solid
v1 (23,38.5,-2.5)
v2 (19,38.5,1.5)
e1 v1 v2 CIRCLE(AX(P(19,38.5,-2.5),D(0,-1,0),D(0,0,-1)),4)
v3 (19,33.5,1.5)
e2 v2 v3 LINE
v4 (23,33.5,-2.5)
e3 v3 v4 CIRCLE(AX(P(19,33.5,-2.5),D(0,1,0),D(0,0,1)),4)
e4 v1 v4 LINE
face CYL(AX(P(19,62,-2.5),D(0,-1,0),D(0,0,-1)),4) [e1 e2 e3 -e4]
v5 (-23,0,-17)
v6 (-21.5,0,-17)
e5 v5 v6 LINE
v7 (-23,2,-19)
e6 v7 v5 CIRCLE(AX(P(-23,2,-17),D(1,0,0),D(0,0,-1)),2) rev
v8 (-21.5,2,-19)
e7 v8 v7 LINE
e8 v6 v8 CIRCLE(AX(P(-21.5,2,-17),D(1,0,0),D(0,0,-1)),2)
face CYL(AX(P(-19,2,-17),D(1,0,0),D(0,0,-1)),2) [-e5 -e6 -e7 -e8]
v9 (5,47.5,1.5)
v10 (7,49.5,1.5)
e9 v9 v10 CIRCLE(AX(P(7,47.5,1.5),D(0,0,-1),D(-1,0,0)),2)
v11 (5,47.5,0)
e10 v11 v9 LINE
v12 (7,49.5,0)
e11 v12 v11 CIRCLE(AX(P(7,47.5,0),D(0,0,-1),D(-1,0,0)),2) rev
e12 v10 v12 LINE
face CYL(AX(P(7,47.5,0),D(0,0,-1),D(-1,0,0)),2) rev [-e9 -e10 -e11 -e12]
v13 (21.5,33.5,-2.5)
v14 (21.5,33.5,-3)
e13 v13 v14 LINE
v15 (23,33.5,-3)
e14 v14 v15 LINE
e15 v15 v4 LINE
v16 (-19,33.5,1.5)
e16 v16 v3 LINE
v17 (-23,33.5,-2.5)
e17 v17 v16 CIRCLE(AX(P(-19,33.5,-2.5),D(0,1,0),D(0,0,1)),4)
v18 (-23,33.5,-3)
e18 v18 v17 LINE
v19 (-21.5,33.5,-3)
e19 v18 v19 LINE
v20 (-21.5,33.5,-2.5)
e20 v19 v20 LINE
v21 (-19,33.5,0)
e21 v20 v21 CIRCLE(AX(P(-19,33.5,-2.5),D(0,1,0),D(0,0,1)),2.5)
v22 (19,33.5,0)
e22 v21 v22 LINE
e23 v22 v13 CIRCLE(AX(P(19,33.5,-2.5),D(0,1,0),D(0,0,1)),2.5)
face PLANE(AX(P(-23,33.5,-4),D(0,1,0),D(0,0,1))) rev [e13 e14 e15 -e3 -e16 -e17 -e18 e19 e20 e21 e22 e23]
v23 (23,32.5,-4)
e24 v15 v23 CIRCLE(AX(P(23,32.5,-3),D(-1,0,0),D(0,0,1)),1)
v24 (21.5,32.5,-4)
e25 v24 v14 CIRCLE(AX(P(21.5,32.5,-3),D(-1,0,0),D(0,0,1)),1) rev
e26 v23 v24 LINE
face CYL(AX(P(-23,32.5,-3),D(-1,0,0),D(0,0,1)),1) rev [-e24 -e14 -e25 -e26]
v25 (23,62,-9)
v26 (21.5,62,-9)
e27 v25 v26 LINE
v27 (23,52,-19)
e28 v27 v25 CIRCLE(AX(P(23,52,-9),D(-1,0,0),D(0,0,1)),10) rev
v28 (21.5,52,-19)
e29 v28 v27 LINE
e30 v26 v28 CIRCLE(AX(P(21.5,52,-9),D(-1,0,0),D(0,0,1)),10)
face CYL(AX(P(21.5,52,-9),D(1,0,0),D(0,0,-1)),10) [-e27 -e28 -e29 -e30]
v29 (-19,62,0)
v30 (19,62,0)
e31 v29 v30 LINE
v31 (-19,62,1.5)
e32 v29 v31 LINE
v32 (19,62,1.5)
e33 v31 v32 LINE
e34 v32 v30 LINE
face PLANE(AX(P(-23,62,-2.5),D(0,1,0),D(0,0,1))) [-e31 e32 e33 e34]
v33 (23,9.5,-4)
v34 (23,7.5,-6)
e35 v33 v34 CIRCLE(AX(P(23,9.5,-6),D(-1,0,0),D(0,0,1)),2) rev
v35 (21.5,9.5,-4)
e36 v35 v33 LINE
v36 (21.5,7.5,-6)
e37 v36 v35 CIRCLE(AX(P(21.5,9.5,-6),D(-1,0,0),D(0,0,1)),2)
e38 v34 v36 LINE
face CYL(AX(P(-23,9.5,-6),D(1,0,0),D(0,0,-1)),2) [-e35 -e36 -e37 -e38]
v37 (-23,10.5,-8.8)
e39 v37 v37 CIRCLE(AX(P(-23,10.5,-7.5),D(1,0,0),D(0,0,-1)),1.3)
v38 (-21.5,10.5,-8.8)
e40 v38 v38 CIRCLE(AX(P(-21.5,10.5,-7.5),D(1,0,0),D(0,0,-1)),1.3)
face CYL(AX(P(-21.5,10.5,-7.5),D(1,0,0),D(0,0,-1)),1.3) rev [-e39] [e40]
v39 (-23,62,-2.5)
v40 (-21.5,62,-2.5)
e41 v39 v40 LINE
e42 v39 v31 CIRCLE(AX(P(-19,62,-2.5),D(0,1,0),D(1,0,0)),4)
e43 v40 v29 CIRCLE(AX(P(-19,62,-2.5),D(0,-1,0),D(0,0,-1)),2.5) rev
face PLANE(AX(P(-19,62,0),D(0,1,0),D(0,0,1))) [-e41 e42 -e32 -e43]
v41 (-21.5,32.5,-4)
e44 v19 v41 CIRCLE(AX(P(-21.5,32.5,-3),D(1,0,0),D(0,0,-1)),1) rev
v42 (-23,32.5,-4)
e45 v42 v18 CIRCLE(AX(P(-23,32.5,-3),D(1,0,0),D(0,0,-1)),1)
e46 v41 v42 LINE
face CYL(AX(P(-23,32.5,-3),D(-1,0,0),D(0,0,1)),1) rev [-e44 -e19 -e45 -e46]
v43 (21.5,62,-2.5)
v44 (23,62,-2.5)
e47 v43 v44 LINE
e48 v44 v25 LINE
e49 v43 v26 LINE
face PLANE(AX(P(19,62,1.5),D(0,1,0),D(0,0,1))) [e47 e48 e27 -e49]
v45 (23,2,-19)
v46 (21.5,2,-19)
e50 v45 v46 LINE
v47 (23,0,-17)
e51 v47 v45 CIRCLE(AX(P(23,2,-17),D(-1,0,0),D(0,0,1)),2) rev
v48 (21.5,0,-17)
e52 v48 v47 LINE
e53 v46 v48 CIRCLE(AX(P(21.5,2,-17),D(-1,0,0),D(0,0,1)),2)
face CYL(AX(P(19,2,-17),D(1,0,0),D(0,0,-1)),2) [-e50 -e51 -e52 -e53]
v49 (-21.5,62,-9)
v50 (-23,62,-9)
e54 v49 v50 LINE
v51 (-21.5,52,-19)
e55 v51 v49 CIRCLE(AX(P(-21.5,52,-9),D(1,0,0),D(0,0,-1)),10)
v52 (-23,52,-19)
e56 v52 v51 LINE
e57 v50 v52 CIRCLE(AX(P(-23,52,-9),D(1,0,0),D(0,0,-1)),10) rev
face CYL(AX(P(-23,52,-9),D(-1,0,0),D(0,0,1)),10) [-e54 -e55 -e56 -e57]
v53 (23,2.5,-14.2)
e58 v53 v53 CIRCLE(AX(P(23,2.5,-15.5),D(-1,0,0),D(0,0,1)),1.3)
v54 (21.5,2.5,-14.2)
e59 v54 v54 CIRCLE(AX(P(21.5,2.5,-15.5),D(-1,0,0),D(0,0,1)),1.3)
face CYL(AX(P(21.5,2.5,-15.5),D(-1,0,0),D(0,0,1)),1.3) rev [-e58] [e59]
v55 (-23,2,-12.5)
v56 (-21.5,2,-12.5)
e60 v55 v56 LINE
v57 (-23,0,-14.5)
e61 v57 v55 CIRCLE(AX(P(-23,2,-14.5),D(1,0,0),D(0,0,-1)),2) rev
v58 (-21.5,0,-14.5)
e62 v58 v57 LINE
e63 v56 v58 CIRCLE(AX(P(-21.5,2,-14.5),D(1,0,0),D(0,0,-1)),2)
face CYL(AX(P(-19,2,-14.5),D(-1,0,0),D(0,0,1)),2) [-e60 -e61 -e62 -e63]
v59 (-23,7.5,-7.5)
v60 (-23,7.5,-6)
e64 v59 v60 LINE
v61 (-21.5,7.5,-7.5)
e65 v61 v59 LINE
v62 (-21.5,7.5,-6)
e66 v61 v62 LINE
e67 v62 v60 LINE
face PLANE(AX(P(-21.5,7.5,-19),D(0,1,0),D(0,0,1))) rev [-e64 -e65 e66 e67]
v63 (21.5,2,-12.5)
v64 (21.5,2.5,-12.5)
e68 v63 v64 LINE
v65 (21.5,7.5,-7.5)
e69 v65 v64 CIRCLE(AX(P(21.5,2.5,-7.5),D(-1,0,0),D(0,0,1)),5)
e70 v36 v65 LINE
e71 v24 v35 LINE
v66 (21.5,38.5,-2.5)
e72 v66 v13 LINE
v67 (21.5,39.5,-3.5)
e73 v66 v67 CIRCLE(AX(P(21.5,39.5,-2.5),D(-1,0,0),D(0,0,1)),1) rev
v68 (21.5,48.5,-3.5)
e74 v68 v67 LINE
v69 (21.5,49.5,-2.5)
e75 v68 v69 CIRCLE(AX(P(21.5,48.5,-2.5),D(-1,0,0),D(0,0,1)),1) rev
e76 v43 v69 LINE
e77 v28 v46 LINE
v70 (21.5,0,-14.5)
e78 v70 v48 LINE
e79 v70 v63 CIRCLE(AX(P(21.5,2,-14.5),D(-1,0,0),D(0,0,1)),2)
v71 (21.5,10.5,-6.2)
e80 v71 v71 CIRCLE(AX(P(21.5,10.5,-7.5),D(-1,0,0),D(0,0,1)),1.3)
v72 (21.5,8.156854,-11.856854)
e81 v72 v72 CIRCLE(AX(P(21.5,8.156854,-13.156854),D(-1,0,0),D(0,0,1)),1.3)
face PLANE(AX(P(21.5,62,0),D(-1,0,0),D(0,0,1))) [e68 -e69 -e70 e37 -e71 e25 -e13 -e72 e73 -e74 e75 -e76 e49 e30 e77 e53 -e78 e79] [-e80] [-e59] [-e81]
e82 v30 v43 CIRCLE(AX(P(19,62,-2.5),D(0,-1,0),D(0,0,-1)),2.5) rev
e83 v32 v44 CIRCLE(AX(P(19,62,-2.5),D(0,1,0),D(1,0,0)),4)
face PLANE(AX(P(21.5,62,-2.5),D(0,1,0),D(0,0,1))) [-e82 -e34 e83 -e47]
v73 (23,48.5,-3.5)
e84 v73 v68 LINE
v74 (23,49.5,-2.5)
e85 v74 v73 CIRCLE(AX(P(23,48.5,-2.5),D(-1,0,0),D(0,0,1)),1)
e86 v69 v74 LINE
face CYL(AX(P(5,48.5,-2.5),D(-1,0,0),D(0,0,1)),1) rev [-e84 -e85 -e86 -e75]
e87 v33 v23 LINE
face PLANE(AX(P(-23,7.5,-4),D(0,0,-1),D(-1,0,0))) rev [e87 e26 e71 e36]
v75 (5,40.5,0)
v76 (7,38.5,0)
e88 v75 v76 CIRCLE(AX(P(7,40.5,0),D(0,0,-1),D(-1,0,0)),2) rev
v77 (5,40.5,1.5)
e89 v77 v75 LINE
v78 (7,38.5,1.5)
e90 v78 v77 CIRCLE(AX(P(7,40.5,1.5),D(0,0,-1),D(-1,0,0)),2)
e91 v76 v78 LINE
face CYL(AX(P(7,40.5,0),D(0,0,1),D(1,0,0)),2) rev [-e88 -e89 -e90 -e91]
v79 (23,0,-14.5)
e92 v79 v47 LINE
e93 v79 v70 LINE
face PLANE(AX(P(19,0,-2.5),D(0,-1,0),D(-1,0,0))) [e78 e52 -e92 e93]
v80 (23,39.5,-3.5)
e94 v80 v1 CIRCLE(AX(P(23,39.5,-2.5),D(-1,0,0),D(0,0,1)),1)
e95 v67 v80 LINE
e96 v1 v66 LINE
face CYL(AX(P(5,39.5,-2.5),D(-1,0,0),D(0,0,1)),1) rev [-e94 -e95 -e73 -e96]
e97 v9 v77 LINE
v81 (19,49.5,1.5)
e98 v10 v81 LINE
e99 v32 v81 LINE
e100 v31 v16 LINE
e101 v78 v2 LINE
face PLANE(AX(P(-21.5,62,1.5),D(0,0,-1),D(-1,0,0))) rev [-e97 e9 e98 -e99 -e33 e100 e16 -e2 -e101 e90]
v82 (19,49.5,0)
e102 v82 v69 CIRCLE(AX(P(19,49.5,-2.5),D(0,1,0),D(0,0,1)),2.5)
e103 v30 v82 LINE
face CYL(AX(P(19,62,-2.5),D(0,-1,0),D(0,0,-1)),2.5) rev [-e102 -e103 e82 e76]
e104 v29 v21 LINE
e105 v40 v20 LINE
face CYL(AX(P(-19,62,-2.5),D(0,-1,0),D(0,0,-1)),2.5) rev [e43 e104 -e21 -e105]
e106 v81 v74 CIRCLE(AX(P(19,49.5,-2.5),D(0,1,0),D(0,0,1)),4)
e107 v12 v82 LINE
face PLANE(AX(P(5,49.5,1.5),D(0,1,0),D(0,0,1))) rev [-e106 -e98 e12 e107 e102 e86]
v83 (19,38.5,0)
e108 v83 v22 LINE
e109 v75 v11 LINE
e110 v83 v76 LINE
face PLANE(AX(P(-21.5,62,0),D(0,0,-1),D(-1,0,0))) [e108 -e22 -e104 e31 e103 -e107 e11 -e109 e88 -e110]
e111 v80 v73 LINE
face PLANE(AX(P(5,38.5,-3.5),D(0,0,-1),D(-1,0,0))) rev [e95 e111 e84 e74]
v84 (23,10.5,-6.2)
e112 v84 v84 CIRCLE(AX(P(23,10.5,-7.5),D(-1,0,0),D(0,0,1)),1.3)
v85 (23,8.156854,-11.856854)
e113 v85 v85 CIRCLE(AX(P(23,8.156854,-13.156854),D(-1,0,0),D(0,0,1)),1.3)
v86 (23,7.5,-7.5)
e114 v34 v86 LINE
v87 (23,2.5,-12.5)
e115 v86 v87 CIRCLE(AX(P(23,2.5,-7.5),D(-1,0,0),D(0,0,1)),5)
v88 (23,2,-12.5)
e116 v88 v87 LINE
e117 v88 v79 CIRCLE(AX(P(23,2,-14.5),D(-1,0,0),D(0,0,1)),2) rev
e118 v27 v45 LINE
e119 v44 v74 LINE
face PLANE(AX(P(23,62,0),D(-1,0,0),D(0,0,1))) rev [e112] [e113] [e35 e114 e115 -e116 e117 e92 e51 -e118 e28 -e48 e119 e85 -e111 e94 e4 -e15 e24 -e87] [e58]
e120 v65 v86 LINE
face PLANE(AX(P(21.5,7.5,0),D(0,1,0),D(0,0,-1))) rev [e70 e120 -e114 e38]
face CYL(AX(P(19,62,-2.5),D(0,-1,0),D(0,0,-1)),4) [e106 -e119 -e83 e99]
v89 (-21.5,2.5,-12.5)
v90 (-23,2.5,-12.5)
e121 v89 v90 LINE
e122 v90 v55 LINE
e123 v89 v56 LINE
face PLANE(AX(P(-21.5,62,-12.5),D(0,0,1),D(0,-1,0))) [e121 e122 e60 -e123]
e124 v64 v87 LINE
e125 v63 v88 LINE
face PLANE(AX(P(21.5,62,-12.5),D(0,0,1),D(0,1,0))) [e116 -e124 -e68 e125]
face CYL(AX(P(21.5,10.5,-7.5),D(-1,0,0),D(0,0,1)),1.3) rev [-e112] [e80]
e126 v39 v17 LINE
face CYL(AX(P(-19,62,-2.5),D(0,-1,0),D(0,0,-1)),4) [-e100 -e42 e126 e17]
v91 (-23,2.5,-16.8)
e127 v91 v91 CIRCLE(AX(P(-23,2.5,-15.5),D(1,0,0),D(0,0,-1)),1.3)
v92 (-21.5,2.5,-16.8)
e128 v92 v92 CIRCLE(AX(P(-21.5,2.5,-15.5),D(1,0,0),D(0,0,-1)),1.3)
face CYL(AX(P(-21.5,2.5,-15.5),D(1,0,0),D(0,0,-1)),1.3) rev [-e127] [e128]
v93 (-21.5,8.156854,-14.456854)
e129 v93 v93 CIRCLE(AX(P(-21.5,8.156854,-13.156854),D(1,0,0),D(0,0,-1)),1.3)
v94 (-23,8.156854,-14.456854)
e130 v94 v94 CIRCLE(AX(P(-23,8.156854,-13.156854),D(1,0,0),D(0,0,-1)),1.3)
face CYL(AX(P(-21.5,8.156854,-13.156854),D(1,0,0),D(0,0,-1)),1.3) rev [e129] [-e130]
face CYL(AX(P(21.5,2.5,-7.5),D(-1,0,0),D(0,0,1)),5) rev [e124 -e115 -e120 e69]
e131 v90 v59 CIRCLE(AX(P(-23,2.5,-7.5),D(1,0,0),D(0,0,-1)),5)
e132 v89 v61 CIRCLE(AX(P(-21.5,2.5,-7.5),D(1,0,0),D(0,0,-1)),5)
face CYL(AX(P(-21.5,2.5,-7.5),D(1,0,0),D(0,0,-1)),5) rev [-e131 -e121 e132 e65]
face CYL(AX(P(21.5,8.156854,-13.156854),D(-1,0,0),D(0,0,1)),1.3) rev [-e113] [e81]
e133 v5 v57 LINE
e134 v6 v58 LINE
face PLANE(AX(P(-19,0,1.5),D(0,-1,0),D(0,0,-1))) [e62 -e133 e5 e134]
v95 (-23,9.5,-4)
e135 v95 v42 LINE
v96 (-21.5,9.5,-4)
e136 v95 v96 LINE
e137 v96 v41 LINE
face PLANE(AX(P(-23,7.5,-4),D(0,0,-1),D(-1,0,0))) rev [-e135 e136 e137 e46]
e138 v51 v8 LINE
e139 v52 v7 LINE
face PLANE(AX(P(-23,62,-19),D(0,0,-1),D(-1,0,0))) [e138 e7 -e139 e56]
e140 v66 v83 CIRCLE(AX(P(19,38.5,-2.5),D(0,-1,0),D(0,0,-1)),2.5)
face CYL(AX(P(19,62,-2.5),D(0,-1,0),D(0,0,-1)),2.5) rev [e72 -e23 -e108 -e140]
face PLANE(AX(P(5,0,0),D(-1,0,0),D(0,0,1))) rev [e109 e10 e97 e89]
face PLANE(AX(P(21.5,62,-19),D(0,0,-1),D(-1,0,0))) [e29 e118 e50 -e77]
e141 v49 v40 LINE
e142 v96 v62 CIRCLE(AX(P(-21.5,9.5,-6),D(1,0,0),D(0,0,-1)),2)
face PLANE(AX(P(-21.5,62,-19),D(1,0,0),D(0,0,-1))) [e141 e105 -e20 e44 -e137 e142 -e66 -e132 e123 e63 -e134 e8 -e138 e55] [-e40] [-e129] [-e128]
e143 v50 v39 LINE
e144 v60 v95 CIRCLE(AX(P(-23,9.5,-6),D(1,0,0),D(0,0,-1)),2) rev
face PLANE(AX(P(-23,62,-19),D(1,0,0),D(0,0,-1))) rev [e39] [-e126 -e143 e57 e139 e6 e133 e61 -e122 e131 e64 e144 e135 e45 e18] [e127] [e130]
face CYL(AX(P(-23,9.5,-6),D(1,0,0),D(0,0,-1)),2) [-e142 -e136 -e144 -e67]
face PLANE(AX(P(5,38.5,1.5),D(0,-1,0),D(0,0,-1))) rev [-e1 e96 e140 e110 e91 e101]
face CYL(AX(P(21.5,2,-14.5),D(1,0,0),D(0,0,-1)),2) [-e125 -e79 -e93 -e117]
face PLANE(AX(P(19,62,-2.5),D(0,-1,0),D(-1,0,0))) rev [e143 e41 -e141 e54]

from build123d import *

# Parameters (mm, degrees)
BASE_FLANGE1_DEPTH      = 62
CUT_EXTRUDE4_START      = -23
CUT_EXTRUDE4_OUTLINE_R  = 1.3
CUT_EXTRUDE4_DEPTH      = 46
CUT_EXTRUDE5_DEPTH      = 69.804069647
CUT_EXTRUDE5_DEPTH_BACK = 69.804069647
SKETCH9_W               = 9
SKETCH9_H               = 7.5
CUT_EXTRUDE7_DEPTH      = 69.804069647
CUT_EXTRUDE7_DEPTH_BACK = 69.804069647
SKETCH12_W              = 5.5
SKETCH12_H              = 26
SKETCH14_W              = 5
SKETCH14_H              = 11
CUT_EXTRUDE8_DEPTH      = 18
FILLET1_R               = 10
FILLET2_R               = 2
FILLET3_R               = 1


# Read off the part's stored shape, not the designer's step: Cut-Extrude4
# Sheet-metal steps are written as plain solids
with BuildPart() as part:
    # Sketch2 → Base-Flange1 (new body)
    with BuildSketch(Plane(origin=(0, 0, 0), x_dir=(1, 0, 0), z_dir=(0, 1, 0))):
        with BuildLine():
            Line((-21.5, 19), (-21.5, 2.5))
            ThreePointArc((-21.5, 2.5), (-20.767766953, 0.732233047), (-19, 0))
            Line((-19, 0), (19, 0))
            ThreePointArc((19, 0), (20.767766953, 0.732233047), (21.5, 2.5))
            Line((21.5, 2.5), (21.5, 19))
            Line((21.5, 19), (23, 19))
            Line((23, 19), (23, 2.5))
            ThreePointArc((23, 2.5), (21.828427125, -0.328427125), (19, -1.5))
            Line((19, -1.5), (-19, -1.5))
            ThreePointArc((-19, -1.5), (-21.828427125, -0.328427125), (-23, 2.5))
            Line((-23, 2.5), (-23, 19))
            Line((-23, 19), (-21.5, 19))
        make_face()
    extrude(amount=BASE_FLANGE1_DEPTH)

    # Cut-Extrude4 outline → Cut-Extrude4 (cut)
    with BuildSketch(Plane(origin=(0, 0, 0), x_dir=(0, 0, -1), z_dir=(1, 0, 0)).offset(CUT_EXTRUDE4_START)):
        with Locations((15.5, 2.5)):
            Circle(CUT_EXTRUDE4_OUTLINE_R)
        with Locations((13.156854249, 8.156854249)):
            Circle(CUT_EXTRUDE4_OUTLINE_R)
        with Locations((7.5, 10.5)):
            Circle(CUT_EXTRUDE4_OUTLINE_R)
        with BuildLine():
            ThreePointArc((12.5, 2.5), (7.5, 7.5), (2.5, 2.5))
            Line((2.5, 2.5), (2.5, 0))
            Line((2.5, 0), (12.5, 0))
            Line((12.5, 0), (12.5, 2.5))
        make_face()
    extrude(amount=CUT_EXTRUDE4_DEPTH, mode=Mode.SUBTRACT)

    # Sketch9 → Cut-Extrude5 (cut, two sides: drawn at the far end of the back side and taken through both)
    with BuildSketch(Plane(origin=(0, 0, 0), x_dir=(0, 0, -1), z_dir=(1, 0, 0)).offset(-CUT_EXTRUDE5_DEPTH_BACK)):
        with Locations((3, 3.75)):
            Rectangle(SKETCH9_W, SKETCH9_H)
    extrude(amount=CUT_EXTRUDE5_DEPTH + CUT_EXTRUDE5_DEPTH_BACK, mode=Mode.SUBTRACT)

    # Sketch12 → Cut-Extrude7 (cut, two sides: drawn at the far end of the back side and taken through both)
    with BuildSketch(Plane(origin=(0, 0, 0), x_dir=(0, 0, -1), z_dir=(1, 0, 0)).offset(-CUT_EXTRUDE7_DEPTH_BACK)):
        with Locations((1.25, 20.5)):
            Rectangle(SKETCH12_W, SKETCH12_H)
    extrude(amount=CUT_EXTRUDE7_DEPTH + CUT_EXTRUDE7_DEPTH_BACK, mode=Mode.SUBTRACT)

    # Sketch14 → Cut-Extrude8 (cut)
    with BuildSketch(Plane(origin=(23, 0, 0), x_dir=(0, 0, -1), z_dir=(1, 0, 0))):
        with Locations((1, 44)):
            Rectangle(SKETCH14_W, SKETCH14_H)
    extrude(amount=-CUT_EXTRUDE8_DEPTH, mode=Mode.SUBTRACT)

    # Fillet1
    fillet1_edges = [part.edges().sort_by_distance(p)[0] for p in [
        (-22.25, 62, -19),
        (22.25, 62, -19),
    ]]
    fillet(fillet1_edges, radius=FILLET1_R)

    # Fillet2
    fillet2_edges = [part.edges().sort_by_distance(p)[0] for p in [
        (-22.25, 0, -19),
        (22.25, 0, -19),
        (22.25, 7.5, -4),
        (-22.25, 7.5, -4),
        (5, 49.5, 0.75),
        (5, 38.5, 0.75),
        (-22.25, 0, -12.5),
        (22.25, 0, -12.5),
    ]]
    fillet(fillet2_edges, radius=FILLET2_R)

    # Fillet3
    fillet3_edges = [part.edges().sort_by_distance(p)[0] for p in [
        (22.25, 33.5, -4),
        (-22.25, 33.5, -4),
        (22.25, 49.5, -3.5),
        (22.25, 38.5, -3.5),
    ]]
    fillet(fillet3_edges, radius=FILLET3_R)


solid = part.part
